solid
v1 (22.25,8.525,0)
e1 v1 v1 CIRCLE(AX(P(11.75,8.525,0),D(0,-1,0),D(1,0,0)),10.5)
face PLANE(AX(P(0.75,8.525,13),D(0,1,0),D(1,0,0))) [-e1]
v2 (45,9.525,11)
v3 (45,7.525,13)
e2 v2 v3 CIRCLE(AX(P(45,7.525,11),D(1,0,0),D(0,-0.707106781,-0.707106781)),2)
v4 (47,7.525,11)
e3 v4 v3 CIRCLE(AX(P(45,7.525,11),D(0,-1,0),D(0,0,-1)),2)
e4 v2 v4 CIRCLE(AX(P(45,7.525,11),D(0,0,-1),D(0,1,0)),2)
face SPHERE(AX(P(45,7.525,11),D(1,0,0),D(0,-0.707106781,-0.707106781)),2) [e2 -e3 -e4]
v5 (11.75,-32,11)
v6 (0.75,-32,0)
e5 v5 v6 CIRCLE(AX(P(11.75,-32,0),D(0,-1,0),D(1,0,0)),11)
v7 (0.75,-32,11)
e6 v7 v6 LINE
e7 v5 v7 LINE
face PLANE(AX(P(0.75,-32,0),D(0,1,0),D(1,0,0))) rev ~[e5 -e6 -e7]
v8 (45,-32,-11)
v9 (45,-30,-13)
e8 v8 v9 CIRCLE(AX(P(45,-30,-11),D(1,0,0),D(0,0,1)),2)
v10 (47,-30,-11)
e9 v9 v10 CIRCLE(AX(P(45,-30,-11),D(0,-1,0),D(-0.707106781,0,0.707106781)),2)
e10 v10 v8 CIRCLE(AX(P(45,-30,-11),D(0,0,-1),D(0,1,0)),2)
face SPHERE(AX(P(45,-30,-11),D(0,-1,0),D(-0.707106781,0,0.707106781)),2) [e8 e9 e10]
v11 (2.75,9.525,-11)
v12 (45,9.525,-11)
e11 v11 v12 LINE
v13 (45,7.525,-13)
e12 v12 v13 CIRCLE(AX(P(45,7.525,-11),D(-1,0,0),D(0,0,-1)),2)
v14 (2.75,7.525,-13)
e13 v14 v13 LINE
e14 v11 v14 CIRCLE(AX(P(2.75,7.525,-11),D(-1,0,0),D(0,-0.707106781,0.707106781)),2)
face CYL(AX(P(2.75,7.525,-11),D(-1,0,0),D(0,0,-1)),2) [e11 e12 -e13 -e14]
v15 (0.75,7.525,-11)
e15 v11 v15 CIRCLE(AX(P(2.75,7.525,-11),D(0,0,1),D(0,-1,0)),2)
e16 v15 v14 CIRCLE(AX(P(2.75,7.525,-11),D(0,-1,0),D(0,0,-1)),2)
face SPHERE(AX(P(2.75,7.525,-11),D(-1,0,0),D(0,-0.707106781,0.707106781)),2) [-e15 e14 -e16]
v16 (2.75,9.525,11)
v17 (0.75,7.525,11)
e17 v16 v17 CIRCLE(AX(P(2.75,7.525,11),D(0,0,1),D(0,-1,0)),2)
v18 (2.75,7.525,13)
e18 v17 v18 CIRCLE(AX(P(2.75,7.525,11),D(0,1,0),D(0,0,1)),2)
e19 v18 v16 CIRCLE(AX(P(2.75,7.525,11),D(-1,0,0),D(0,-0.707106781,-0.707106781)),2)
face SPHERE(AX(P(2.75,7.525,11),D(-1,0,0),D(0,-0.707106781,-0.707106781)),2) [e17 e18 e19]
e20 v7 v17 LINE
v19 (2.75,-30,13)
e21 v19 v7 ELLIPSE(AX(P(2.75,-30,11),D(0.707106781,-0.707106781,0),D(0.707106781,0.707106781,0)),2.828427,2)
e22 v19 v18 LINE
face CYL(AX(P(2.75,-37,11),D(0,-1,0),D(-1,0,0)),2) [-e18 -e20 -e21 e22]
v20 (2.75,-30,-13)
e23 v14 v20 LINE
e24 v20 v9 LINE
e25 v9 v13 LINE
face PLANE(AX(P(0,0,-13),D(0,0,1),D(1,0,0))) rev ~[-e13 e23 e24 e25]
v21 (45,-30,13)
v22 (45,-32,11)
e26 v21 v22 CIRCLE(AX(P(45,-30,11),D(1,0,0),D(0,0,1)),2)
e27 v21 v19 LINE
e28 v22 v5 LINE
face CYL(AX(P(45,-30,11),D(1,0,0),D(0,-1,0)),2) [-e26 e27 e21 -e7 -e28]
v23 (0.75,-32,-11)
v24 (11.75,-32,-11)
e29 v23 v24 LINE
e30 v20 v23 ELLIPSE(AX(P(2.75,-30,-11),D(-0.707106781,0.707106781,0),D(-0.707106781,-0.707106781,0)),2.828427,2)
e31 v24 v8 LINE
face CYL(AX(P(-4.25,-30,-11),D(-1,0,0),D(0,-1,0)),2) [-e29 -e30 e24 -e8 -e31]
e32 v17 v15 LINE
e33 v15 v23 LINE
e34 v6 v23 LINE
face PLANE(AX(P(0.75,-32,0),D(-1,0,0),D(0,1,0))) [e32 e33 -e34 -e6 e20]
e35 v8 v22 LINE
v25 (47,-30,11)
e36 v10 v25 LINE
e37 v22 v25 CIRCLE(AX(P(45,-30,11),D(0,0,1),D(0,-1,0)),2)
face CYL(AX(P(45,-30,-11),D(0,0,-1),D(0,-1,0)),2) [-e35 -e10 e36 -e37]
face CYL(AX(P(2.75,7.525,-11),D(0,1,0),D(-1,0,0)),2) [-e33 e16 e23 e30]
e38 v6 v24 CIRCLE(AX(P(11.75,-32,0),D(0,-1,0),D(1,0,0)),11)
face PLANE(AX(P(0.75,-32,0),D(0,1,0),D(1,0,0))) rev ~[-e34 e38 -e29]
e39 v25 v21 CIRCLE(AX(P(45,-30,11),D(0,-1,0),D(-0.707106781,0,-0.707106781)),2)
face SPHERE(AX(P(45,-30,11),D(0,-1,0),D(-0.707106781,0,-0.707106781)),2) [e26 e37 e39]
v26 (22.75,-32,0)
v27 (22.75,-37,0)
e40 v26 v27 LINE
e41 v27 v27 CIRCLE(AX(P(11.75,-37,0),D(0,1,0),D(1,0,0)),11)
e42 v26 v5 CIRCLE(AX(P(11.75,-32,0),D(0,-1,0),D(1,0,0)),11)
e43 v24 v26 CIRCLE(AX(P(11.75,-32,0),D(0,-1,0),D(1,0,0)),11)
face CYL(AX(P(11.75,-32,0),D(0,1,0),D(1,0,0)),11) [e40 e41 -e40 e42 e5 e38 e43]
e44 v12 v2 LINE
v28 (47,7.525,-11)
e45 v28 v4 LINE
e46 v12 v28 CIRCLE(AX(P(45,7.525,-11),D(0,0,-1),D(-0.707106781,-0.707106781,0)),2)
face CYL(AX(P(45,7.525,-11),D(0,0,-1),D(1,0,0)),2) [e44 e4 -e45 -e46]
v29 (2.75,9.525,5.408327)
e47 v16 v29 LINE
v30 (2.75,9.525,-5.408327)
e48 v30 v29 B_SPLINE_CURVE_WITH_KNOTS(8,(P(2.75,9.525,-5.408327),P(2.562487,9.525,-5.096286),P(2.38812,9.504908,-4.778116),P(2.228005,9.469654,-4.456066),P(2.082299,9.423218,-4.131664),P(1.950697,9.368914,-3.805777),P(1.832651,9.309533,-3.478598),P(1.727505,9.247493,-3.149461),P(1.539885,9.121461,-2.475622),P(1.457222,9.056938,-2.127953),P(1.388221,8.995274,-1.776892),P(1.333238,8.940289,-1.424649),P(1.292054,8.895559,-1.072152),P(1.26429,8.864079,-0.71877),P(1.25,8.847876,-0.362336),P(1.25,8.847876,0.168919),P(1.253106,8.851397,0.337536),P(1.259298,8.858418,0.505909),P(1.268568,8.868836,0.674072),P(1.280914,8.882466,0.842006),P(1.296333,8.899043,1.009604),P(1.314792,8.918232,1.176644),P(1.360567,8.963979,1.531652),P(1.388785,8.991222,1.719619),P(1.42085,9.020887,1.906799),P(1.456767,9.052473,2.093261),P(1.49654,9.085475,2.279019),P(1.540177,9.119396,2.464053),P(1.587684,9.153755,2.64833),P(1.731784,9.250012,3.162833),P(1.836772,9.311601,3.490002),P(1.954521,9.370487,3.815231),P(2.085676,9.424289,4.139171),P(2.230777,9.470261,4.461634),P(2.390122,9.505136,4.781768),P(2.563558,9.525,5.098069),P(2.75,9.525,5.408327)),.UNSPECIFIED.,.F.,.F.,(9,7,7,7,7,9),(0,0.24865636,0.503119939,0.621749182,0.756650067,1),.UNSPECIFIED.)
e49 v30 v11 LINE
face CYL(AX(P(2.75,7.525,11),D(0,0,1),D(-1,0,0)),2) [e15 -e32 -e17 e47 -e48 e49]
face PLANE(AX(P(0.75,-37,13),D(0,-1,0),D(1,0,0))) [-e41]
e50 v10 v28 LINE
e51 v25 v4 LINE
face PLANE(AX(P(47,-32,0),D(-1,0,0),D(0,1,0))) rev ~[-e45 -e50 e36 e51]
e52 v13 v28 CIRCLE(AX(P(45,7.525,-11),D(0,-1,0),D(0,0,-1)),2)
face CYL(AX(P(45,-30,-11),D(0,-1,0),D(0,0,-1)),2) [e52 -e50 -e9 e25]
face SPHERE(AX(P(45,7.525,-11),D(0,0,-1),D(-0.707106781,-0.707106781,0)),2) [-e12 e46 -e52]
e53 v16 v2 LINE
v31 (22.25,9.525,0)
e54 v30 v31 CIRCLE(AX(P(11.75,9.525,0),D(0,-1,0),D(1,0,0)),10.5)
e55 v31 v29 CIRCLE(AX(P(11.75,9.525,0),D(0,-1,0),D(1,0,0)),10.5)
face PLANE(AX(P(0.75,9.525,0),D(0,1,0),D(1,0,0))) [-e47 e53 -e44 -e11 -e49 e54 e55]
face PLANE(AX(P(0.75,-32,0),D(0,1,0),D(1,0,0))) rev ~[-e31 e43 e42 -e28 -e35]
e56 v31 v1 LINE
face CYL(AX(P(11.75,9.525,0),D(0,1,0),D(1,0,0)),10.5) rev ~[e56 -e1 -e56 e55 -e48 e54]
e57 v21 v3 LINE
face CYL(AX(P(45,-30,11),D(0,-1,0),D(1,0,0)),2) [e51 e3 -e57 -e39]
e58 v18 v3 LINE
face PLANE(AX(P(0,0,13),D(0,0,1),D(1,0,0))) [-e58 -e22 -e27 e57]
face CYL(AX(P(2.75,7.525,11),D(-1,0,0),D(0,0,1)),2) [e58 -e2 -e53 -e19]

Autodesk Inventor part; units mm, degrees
ref_plane "YZ Plane" through (0, 0, 0) normal (1, 0, 0) x (0, 1, 0)
ref_plane "XZ Plane" through (0, 0, 0) normal (0, 1, 0) x (-1, 0, 0)
ref_plane "XY Plane" through (0, 0, 0) normal (0, 0, 1) x (1, 0, 0)
sketch "Sketch1" plane through (0, 0, 0) normal (0, 0, 1) x (1, 0, 0)
  line L0 (11.75, -37) -> (22.75, -37)
  line L1 (11.75, -37) -> (0.75, -37)
  line L2 (0.75, -37) -> (0.75, -32)
  line L3 (0.75, -32) -> (22.75, -32)
  line L4 (22.75, -32) -> (22.75, -37)
  line L5 (0.75, -32) -> (0.75, 6.35)
  line L6 (22.75, -32) -> (47, -32)
  line L7 (47, -32) -> (47, 6.35)
  line L8 (0.75, 6.35) -> (0.75, 9.525)
  line L9 (0.75, 9.525) -> (47, 9.525)
  line L10 (47, 9.525) -> (47, 6.35)
  point P0 (0, 0)
  dimension "d2" = 11
  dimension "d3" = 11
  dimension "d4" = 5
extrude "Extrusion1" add sketch "Sketch1" along normal mid plane 26 contours L3 L5 L8 L9 L10 L7 L6
sketch "Sketch2" plane through (0.75, 9.525, 13) normal (0, 1, 0) x (1, 0, 0)
  line L0 (0, 26) -> (0, 0) projected
  line L1 (0, 13) -> (11, 13)
  circle A0 centre (11, 13) radius 10.5
  point P0 (-0.75, 13)
  dimension "d7" = 11
  dimension "d8" = 21
extrude "Extrusion2" cut sketch "Sketch2" against normal blind 1
sketch "Sketch3" plane through (0.75, -32, 13) normal (0, -1, 0) x (1, 0, 0)
  line L0 (0, -26) -> (0, 0) projected
  line L1 (46.25, -26) -> (46.25, 0) projected
  line L2 (0, -13) -> (11, -13)
  circle A0 centre (11, -13) radius 11
  point P0 (-0.75, -13)
  dimension "d11" = 11
  dimension "d12" = 22
extrude "Extrusion3" add sketch "Sketch3" along normal blind 5
fillet "Fillet1" radius 2 11 edges at (47, -11.2375, 13) (47, -32, 0) (47, -11.2375, -13) (47, 9.525, 0) (23.875, 9.525, 13) (23.875, -32, 13) (23.875, -32, -13) (0.75, -11.2375, 13) (0.75, 9.525, 0) (0.75, -11.2375, -13) (23.875, 9.525, -13)
properties part number "Wrist2"
